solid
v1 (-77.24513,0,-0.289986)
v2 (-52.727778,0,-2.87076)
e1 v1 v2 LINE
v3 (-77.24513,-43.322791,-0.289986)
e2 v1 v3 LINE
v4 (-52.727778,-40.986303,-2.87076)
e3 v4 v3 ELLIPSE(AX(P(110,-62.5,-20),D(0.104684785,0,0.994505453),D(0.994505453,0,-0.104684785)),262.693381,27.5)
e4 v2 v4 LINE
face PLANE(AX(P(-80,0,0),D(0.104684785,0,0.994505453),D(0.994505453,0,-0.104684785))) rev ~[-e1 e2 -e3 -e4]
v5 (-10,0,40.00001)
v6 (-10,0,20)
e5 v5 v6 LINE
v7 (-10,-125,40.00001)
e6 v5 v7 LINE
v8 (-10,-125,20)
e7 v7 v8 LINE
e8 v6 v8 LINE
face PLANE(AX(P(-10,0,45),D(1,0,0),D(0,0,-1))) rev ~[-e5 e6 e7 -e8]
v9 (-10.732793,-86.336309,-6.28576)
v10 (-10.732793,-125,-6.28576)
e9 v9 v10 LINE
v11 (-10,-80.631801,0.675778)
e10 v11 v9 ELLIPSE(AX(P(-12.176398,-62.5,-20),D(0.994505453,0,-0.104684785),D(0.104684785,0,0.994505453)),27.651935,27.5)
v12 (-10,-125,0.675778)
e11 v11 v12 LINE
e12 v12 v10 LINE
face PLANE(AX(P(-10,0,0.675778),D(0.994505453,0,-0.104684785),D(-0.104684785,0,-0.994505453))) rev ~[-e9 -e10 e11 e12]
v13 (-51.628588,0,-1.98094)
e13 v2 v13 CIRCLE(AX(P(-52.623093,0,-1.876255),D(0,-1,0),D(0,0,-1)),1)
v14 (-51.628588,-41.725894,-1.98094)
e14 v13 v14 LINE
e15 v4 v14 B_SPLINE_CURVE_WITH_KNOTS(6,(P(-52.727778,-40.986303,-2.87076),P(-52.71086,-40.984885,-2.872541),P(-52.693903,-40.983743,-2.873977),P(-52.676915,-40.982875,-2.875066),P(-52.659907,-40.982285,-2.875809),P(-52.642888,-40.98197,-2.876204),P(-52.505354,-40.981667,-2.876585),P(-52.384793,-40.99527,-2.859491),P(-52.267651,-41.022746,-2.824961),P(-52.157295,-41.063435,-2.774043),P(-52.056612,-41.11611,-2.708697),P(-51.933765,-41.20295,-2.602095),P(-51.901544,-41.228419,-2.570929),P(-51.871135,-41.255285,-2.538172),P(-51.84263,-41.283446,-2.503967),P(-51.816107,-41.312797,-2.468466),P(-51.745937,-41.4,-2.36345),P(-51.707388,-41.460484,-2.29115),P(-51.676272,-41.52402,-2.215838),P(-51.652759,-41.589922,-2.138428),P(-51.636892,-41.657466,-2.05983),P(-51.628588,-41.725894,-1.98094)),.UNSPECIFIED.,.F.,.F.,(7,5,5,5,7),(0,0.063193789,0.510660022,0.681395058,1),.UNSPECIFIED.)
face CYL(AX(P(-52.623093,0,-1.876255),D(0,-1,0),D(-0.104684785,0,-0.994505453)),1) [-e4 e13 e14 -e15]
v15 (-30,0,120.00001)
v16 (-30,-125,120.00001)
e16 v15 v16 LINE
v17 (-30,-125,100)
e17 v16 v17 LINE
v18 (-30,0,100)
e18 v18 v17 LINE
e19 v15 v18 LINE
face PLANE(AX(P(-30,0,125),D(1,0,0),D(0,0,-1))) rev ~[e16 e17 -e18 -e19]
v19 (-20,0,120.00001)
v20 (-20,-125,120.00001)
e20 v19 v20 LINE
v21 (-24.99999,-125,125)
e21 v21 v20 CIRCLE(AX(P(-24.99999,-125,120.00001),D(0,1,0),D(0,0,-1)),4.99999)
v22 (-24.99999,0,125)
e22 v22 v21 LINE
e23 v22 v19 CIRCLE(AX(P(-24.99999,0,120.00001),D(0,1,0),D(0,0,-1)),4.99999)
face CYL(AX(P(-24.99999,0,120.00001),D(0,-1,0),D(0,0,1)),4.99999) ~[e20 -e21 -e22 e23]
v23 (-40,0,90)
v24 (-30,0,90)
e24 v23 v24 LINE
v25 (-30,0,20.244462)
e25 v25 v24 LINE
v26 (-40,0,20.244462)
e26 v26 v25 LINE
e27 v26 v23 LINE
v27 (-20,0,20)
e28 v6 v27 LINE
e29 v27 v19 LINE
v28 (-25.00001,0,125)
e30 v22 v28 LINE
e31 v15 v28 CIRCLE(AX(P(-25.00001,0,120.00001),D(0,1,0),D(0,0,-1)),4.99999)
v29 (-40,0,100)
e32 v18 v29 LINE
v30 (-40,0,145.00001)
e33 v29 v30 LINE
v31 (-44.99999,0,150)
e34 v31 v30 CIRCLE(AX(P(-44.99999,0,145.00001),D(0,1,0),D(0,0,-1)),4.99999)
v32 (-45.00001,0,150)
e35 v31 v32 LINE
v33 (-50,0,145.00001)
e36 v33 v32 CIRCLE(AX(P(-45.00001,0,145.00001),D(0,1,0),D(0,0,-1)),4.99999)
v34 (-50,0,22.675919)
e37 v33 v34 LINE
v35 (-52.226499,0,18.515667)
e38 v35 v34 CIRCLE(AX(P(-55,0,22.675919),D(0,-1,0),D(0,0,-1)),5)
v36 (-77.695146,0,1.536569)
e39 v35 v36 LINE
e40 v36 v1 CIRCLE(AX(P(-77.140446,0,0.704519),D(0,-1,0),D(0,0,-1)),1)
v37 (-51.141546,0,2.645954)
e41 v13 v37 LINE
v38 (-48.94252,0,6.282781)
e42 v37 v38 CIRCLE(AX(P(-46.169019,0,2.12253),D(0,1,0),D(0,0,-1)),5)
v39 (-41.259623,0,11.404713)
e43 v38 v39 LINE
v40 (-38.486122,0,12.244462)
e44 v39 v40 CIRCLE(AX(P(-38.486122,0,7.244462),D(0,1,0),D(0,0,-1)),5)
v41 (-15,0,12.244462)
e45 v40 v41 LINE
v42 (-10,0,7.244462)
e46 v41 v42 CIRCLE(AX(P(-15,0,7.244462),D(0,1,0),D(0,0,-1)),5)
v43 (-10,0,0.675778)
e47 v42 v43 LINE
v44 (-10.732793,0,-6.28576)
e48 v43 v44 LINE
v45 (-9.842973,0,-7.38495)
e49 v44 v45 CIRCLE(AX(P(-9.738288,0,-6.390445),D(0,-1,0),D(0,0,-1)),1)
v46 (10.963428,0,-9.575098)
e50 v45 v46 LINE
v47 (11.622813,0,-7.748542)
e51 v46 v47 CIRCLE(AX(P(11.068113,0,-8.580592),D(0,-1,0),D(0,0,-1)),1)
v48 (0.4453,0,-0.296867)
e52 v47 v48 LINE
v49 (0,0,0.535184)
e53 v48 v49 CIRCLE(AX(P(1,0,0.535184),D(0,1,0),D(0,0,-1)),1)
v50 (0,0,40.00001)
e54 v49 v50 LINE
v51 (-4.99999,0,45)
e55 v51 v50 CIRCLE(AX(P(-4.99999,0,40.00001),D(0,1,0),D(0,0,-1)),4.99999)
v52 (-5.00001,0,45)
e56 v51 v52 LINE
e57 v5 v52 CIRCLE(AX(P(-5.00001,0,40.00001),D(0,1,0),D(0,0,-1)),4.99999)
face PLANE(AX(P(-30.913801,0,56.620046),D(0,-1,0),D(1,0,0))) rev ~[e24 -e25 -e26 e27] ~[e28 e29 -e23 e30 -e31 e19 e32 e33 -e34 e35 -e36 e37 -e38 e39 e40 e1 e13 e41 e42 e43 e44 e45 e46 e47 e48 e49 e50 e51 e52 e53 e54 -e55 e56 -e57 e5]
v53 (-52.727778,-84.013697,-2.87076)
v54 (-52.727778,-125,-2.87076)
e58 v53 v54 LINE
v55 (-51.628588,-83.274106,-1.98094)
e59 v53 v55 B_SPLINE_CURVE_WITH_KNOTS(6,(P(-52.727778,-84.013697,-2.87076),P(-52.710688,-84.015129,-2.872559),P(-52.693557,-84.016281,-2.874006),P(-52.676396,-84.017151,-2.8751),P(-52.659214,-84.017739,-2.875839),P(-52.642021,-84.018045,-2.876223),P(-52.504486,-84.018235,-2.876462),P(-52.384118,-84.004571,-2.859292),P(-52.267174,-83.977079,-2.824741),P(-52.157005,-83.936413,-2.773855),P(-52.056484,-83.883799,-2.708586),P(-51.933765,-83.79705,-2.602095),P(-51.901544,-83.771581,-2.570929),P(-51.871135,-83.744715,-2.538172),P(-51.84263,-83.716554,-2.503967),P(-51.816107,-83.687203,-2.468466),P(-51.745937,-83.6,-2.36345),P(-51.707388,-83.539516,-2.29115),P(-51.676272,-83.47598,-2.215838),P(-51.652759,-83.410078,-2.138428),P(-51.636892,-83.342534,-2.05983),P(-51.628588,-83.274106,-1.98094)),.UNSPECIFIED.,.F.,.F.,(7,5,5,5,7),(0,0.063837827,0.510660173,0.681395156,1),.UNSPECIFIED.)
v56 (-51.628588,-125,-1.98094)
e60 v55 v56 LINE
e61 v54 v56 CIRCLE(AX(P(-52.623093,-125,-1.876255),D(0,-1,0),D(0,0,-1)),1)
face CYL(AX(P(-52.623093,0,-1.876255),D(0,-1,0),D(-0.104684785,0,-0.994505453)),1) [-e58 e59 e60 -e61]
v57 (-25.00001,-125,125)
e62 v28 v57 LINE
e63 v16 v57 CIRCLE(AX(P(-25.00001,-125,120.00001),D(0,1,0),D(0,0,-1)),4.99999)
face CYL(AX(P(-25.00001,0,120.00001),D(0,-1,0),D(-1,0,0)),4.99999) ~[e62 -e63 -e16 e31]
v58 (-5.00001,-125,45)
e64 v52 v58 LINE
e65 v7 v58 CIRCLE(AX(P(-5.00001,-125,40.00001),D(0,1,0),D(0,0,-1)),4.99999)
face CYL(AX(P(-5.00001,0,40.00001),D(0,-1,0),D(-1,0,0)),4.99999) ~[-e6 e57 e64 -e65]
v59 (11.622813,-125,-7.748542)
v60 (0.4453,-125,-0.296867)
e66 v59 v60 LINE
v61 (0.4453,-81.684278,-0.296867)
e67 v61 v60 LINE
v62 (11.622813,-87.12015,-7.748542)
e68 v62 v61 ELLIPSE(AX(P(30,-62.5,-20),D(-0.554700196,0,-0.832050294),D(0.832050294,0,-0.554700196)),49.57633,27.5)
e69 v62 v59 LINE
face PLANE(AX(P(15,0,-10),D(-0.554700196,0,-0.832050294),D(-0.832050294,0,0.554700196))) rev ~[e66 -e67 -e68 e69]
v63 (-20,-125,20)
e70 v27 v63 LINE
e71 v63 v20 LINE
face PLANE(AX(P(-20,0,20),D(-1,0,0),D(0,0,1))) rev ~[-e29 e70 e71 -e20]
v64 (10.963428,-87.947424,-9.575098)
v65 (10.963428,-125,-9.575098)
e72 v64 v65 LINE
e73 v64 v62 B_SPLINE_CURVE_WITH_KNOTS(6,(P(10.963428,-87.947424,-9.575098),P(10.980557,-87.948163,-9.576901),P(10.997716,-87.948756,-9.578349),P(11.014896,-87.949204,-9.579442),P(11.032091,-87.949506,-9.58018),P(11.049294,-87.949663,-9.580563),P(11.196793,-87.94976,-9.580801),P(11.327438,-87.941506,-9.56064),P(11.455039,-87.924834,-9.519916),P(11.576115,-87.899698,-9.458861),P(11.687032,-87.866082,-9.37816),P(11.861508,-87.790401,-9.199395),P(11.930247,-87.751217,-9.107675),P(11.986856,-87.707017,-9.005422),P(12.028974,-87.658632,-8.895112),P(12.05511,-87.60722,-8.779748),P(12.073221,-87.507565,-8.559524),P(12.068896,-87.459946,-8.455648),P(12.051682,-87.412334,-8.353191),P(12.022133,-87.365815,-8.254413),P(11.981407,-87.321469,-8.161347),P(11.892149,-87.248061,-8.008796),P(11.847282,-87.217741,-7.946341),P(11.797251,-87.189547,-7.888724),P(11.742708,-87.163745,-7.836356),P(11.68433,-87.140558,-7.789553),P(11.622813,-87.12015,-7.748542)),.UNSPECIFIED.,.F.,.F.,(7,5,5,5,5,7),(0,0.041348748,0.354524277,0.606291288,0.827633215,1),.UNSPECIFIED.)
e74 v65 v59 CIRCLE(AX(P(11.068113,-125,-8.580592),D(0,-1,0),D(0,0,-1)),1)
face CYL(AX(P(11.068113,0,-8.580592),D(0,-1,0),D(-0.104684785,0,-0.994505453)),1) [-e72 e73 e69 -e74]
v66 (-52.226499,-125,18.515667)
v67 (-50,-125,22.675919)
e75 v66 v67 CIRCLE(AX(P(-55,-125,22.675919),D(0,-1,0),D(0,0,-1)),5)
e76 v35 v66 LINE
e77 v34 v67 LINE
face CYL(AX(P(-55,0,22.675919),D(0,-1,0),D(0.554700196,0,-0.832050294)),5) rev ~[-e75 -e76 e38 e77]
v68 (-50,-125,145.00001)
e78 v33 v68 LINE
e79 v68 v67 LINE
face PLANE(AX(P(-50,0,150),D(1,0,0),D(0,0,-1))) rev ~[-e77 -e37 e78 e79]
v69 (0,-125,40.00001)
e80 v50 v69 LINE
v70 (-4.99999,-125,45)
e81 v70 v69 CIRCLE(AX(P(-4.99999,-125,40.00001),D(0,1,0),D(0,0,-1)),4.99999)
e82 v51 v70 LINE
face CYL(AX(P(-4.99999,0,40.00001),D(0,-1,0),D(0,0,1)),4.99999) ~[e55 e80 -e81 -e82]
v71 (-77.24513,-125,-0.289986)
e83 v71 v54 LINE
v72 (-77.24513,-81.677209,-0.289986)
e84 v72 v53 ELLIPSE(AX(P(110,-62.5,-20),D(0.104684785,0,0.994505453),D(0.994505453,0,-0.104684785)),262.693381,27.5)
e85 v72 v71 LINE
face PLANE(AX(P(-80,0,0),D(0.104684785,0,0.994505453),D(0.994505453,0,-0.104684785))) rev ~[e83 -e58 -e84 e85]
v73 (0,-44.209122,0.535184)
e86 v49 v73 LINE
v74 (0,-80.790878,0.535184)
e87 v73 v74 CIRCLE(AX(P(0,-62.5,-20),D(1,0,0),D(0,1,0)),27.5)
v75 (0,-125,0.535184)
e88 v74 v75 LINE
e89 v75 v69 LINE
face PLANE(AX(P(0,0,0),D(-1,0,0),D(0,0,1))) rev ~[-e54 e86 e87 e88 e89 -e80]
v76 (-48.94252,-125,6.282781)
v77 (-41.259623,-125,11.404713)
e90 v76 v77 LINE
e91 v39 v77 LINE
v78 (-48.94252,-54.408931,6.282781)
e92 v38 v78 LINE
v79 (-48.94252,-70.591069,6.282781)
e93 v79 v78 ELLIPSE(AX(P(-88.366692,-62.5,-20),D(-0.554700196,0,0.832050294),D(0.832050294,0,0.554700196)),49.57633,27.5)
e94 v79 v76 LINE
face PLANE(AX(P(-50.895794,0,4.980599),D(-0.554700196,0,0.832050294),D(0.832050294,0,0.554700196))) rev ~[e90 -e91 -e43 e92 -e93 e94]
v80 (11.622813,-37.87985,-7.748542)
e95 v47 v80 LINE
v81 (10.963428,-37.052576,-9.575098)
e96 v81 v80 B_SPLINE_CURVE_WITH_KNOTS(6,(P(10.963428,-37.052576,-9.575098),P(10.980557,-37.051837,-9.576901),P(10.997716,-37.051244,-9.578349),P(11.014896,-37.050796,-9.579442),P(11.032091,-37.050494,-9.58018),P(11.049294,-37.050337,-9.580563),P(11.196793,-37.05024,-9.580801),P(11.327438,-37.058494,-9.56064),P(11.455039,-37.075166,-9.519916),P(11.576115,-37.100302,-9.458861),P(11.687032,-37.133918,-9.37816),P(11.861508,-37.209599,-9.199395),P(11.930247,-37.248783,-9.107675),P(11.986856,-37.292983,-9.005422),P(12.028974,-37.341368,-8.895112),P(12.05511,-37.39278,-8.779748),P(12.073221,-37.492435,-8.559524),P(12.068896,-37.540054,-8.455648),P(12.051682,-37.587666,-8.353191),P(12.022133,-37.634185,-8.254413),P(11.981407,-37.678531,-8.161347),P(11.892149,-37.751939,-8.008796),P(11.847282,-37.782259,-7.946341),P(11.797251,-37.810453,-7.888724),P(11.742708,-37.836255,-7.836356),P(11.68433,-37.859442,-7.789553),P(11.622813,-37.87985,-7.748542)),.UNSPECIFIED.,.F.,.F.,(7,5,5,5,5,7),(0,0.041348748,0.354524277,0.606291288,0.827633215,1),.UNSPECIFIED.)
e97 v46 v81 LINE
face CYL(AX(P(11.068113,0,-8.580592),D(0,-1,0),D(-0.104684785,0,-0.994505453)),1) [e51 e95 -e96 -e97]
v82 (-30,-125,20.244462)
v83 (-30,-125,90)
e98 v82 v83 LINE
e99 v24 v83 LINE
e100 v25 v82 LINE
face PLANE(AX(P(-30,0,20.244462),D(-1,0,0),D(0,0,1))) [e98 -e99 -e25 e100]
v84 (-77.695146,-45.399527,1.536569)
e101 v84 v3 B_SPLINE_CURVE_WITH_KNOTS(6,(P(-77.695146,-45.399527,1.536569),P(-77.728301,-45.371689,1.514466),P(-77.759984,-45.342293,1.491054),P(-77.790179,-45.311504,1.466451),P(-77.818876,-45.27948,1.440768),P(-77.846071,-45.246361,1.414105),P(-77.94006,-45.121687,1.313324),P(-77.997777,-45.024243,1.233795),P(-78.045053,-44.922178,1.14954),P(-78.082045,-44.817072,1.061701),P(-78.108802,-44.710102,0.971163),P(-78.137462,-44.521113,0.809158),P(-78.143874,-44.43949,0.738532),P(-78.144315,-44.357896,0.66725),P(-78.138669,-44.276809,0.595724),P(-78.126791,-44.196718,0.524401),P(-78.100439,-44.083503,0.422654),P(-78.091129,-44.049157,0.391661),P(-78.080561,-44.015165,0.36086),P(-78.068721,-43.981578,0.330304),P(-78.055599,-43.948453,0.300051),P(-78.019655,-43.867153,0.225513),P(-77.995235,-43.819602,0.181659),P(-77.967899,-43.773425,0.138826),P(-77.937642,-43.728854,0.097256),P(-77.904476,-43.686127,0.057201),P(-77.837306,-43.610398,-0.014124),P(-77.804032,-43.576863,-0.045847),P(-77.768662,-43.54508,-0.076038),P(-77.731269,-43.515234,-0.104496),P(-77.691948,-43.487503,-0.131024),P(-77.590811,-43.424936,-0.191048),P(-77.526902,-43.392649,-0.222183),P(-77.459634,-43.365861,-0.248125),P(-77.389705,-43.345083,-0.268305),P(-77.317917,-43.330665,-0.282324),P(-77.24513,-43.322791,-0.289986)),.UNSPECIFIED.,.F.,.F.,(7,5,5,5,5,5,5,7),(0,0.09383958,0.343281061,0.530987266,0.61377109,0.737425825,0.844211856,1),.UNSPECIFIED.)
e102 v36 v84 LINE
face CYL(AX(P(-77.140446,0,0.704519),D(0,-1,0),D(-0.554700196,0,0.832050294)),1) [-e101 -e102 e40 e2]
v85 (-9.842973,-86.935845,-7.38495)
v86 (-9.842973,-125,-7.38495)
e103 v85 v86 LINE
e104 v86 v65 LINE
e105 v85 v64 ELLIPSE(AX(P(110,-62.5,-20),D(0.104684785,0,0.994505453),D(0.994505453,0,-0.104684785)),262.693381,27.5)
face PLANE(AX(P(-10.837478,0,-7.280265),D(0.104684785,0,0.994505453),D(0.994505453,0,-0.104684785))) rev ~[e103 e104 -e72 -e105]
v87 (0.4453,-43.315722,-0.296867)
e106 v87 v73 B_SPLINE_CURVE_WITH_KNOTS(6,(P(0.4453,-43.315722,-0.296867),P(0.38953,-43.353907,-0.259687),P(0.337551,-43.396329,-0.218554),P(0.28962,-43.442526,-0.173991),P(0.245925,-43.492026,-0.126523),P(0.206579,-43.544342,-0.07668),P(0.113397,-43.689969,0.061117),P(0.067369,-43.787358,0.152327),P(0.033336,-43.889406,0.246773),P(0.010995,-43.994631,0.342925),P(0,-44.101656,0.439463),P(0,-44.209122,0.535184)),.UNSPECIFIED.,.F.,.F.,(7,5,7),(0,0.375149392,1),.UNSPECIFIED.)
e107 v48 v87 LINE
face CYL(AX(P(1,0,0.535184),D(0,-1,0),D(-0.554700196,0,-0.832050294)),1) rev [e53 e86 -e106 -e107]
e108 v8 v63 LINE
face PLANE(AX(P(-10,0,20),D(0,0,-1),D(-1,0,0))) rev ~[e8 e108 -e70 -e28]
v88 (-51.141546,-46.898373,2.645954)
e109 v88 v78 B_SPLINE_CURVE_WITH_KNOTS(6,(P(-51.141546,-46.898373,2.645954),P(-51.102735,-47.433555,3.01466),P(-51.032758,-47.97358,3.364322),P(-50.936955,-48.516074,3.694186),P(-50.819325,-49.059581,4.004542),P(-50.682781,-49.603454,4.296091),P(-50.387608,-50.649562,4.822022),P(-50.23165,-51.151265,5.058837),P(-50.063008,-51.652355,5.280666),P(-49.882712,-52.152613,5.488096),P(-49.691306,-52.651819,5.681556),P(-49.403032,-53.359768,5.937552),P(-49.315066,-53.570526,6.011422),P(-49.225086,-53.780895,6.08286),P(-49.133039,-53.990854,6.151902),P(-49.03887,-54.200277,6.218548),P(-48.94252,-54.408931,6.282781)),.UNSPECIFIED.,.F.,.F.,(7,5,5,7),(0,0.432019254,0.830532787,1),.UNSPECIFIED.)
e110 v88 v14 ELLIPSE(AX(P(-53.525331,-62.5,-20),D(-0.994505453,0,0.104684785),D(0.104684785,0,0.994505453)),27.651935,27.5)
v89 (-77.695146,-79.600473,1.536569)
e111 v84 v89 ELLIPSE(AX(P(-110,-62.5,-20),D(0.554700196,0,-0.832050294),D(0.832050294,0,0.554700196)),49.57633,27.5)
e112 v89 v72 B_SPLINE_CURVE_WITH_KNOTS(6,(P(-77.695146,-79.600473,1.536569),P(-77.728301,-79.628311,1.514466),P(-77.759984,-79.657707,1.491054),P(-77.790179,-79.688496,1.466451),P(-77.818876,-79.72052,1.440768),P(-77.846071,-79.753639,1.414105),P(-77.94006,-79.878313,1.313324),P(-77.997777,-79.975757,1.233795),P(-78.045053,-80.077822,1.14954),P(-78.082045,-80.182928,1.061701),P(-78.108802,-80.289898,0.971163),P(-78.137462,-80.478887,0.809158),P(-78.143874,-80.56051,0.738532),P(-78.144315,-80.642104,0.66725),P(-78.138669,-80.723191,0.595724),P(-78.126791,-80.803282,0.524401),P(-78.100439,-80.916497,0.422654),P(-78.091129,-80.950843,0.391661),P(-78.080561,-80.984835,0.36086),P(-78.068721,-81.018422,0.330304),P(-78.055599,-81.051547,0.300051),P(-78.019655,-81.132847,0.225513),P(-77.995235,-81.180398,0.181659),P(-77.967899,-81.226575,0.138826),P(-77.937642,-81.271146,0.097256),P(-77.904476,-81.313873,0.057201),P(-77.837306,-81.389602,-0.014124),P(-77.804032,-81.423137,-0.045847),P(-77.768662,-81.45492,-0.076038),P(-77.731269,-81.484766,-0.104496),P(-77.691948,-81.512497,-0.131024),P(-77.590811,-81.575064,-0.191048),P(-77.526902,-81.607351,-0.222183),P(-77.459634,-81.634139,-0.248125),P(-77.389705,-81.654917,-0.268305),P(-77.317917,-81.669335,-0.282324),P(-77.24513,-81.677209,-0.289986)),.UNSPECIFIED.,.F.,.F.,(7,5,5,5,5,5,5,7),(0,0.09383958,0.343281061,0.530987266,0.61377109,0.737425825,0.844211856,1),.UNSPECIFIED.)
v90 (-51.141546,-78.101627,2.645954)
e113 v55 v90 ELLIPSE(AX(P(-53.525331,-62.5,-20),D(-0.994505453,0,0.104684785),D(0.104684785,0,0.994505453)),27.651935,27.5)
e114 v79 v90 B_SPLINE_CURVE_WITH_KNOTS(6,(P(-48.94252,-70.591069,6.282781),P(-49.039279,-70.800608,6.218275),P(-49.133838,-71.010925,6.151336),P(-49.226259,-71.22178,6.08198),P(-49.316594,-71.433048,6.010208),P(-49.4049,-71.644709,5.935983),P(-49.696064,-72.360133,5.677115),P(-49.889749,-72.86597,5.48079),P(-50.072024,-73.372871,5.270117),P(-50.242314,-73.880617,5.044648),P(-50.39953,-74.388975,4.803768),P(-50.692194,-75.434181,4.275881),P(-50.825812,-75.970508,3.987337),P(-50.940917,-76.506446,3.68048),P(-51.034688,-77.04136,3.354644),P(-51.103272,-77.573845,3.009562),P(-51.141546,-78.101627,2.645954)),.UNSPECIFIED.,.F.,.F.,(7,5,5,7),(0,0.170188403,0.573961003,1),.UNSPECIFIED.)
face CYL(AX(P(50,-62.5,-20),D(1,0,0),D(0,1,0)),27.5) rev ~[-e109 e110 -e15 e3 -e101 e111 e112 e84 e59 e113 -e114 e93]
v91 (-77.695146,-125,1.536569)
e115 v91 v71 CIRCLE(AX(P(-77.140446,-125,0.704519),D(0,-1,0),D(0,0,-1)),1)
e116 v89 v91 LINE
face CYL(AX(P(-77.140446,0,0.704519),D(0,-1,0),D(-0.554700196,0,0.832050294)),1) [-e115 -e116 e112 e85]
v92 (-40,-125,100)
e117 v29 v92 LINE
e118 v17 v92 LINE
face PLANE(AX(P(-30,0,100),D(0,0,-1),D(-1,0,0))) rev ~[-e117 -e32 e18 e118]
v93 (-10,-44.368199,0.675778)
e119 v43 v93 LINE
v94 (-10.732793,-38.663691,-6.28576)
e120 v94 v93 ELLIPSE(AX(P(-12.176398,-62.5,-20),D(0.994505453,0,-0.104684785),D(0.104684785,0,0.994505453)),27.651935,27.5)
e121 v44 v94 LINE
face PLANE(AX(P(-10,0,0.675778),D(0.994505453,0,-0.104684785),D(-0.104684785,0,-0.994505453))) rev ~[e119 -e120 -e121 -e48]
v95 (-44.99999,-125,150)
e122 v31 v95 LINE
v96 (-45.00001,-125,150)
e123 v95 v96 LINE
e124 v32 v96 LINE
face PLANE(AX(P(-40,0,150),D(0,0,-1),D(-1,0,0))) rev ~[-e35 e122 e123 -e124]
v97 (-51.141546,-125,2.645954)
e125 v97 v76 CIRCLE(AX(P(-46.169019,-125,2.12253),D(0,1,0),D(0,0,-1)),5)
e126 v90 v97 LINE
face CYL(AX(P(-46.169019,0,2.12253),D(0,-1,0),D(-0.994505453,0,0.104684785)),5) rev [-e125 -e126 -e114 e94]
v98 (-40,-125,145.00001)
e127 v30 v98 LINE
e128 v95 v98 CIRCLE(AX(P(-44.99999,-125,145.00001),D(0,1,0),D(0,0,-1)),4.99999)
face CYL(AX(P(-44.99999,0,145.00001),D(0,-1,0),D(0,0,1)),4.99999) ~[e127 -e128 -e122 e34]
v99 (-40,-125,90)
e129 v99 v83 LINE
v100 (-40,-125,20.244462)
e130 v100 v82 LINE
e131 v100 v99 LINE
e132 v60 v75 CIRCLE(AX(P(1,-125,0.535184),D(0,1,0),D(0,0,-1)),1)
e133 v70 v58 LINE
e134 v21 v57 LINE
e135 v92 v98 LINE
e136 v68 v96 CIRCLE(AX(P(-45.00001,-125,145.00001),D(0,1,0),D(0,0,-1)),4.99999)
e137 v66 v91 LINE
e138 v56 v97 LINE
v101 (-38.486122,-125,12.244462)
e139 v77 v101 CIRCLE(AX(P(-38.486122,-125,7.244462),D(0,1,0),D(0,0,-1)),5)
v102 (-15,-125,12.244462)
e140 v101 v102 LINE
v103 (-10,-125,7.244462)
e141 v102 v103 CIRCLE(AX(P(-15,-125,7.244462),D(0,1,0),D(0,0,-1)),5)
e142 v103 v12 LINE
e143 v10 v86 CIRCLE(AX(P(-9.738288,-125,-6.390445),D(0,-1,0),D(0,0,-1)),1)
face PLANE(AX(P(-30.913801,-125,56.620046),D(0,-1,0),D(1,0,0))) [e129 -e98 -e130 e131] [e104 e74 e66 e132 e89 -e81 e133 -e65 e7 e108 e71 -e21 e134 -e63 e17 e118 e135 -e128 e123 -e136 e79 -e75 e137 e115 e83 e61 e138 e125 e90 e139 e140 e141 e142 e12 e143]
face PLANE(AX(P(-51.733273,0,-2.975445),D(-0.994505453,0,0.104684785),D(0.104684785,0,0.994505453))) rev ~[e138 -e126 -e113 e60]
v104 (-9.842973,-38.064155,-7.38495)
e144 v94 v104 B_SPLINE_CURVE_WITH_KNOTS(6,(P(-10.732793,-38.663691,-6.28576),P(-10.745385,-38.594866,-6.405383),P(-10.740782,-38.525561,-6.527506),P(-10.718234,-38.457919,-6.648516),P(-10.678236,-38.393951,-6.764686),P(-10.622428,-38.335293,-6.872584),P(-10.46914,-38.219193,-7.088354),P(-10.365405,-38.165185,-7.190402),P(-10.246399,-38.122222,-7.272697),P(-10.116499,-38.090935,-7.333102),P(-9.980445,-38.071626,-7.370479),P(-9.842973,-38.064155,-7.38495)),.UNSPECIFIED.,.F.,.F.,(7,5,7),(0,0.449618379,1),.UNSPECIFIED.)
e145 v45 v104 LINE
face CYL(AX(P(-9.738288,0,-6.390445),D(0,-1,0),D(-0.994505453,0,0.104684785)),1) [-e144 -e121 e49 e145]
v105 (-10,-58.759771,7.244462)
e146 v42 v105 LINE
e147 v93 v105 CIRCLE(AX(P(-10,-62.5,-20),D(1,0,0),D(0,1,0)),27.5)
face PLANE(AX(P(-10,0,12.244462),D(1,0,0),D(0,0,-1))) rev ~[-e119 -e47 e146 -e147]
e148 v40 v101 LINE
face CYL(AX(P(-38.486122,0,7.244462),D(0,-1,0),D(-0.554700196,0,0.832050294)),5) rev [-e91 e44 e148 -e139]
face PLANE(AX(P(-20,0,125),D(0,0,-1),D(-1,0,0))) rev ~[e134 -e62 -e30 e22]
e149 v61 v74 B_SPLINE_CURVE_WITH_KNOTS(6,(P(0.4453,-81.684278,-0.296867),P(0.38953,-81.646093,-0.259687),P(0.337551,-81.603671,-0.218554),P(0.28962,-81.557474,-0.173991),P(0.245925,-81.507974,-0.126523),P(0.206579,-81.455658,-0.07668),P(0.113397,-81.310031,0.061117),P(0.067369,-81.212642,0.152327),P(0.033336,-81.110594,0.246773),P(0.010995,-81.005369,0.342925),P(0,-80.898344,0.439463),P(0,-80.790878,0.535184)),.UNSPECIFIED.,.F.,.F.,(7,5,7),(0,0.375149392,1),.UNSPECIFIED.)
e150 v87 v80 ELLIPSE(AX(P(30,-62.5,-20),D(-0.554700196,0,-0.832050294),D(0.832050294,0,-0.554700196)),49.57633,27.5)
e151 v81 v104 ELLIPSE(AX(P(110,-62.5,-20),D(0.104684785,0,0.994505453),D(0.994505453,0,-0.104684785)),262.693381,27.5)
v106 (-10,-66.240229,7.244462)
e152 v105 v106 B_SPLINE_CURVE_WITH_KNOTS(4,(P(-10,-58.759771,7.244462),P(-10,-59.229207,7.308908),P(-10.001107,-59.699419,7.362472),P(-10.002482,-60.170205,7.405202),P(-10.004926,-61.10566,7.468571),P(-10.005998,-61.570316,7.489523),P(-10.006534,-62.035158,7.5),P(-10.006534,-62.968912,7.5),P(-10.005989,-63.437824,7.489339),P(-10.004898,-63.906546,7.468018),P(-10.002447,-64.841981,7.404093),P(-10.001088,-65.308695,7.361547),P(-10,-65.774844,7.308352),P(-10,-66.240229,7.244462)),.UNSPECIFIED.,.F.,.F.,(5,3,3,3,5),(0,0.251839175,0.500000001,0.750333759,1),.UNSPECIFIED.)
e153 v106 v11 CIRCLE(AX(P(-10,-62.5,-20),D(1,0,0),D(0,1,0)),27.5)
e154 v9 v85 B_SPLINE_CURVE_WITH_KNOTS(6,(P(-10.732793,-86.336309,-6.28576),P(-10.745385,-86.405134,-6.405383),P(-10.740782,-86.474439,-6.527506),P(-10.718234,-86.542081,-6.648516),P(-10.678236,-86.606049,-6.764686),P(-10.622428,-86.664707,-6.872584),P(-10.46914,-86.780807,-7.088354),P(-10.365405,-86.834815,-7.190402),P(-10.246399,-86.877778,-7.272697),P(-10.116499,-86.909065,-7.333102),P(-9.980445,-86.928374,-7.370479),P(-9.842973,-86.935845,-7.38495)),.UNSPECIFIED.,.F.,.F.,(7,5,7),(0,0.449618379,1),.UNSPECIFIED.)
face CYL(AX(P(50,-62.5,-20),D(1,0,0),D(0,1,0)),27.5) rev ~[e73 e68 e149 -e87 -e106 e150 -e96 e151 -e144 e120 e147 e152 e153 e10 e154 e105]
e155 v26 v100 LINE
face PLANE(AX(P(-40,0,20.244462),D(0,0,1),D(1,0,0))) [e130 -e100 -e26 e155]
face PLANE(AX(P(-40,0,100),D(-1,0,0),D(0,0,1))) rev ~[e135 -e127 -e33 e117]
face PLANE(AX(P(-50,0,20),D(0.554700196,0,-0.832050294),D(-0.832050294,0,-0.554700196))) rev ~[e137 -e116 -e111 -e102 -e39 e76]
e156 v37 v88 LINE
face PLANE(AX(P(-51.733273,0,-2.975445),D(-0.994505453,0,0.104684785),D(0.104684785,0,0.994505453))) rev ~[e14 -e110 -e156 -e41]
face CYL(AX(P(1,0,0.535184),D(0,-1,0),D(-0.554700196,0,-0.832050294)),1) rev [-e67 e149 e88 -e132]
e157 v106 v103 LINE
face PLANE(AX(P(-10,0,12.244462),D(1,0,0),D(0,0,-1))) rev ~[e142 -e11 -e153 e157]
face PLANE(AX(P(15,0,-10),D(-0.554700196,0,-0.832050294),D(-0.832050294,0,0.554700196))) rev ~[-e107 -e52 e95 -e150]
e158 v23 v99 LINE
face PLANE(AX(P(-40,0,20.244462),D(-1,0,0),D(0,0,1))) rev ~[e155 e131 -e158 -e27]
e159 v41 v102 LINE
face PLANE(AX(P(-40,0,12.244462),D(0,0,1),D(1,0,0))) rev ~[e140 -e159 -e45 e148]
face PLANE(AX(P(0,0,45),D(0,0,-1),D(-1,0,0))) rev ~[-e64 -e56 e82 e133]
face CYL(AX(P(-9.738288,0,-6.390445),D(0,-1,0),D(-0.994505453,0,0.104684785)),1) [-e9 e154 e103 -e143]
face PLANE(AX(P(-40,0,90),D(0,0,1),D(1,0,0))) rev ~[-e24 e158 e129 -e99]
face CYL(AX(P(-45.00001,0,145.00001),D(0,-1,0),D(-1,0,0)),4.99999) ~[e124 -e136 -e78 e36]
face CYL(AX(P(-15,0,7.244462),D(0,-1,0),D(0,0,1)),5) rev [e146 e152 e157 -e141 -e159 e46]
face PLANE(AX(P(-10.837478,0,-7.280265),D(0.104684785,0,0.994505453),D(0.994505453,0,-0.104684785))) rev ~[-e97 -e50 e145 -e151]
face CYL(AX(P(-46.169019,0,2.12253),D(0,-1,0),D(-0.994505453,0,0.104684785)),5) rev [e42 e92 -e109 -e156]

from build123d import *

# Parameters (mm, degrees)
F0_W     = 10
F0_H     = 69.7555384352
F1_DEPTH = 125
F2_R     = 1
F3_R     = 4.99999
F5_R     = 5
F6_R     = 5
F8_R     = 27.5
F9_DEPTH = 128.1414455964


# Not quite as in the source:
# - two fillets or chamfers of one size are made in one step
# - a fillet or chamfer is up to 0.001 mm smaller than in the source, because OpenCascade refuses the exact size


with BuildPart() as f1:
    # F0 (on Front) → F1 (new body)
    with BuildSketch(Plane.XZ):
        Polygon((-50, 150), (-50, 20), (-80, 0), (-51.7332726626, -2.9754449829), (-50.8957943865, 4.9805986405), (-40, 12.2444615648), (-30, 12.2444615648), (-10, 12.2444615648), (-10, 10), (-10, 0.6757781788), (-10.8374782761, -7.2802654446), (15, -10), (0, 0), (0, 45), (-10, 45), (-10, 20), (-20, 20), (-20, 125), (-30, 125), (-30, 100), (-40, 100), (-40, 150), align=None)
        with Locations((-35, 55.1222307824)):
            Rectangle(F0_W, F0_H, mode=Mode.SUBTRACT)
    extrude(amount=F1_DEPTH)

    # F2
    f2_edges = [f1.edges().sort_by_distance(p)[0] for p in [
        (-80, -62.5, 0),
        (-10.837478, -62.5, -7.280265),
        (15, -62.5, -10),
        (-51.733273, -62.5, -2.975445),
        (0, -62.5, 0),
    ]]
    fillet(f2_edges, radius=F2_R)

    # F3 (radius 5 in the source; OpenCascade refuses exactly that, so slightly less here)
    f3_edges = [f1.edges().sort_by_distance(p)[0] for p in [
        (0, -62.5, 45),
        (-10, -62.5, 45),
        (-20, -62.5, 125),
        (-30, -62.5, 125),
        (-40, -62.5, 150),
        (-50, -62.5, 150),
    ]]
    fillet(f3_edges, radius=F3_R)

    # F5
    f5_edges = [f1.edges().sort_by_distance(p)[0] for p in [
        (-50.895794, -62.5, 4.980599),
        (-40, -62.5, 12.244462),
        (-10, -62.5, 12.244462),
    ]]
    fillet(f5_edges, radius=F5_R)

    # F6
    f6_edges = [f1.edges().sort_by_distance(p)[0] for p in [
        (-50, -62.5, 20),
    ]]
    fillet(f6_edges, radius=F6_R)

    # F8 (on offset) → F9 (cut, through all)
    with BuildSketch(Plane.YZ.offset(50)):
        with Locations((-62.5, -20)):
            Circle(F8_R)
    extrude(amount=-F9_DEPTH, mode=Mode.SUBTRACT)


solid = f1.part
